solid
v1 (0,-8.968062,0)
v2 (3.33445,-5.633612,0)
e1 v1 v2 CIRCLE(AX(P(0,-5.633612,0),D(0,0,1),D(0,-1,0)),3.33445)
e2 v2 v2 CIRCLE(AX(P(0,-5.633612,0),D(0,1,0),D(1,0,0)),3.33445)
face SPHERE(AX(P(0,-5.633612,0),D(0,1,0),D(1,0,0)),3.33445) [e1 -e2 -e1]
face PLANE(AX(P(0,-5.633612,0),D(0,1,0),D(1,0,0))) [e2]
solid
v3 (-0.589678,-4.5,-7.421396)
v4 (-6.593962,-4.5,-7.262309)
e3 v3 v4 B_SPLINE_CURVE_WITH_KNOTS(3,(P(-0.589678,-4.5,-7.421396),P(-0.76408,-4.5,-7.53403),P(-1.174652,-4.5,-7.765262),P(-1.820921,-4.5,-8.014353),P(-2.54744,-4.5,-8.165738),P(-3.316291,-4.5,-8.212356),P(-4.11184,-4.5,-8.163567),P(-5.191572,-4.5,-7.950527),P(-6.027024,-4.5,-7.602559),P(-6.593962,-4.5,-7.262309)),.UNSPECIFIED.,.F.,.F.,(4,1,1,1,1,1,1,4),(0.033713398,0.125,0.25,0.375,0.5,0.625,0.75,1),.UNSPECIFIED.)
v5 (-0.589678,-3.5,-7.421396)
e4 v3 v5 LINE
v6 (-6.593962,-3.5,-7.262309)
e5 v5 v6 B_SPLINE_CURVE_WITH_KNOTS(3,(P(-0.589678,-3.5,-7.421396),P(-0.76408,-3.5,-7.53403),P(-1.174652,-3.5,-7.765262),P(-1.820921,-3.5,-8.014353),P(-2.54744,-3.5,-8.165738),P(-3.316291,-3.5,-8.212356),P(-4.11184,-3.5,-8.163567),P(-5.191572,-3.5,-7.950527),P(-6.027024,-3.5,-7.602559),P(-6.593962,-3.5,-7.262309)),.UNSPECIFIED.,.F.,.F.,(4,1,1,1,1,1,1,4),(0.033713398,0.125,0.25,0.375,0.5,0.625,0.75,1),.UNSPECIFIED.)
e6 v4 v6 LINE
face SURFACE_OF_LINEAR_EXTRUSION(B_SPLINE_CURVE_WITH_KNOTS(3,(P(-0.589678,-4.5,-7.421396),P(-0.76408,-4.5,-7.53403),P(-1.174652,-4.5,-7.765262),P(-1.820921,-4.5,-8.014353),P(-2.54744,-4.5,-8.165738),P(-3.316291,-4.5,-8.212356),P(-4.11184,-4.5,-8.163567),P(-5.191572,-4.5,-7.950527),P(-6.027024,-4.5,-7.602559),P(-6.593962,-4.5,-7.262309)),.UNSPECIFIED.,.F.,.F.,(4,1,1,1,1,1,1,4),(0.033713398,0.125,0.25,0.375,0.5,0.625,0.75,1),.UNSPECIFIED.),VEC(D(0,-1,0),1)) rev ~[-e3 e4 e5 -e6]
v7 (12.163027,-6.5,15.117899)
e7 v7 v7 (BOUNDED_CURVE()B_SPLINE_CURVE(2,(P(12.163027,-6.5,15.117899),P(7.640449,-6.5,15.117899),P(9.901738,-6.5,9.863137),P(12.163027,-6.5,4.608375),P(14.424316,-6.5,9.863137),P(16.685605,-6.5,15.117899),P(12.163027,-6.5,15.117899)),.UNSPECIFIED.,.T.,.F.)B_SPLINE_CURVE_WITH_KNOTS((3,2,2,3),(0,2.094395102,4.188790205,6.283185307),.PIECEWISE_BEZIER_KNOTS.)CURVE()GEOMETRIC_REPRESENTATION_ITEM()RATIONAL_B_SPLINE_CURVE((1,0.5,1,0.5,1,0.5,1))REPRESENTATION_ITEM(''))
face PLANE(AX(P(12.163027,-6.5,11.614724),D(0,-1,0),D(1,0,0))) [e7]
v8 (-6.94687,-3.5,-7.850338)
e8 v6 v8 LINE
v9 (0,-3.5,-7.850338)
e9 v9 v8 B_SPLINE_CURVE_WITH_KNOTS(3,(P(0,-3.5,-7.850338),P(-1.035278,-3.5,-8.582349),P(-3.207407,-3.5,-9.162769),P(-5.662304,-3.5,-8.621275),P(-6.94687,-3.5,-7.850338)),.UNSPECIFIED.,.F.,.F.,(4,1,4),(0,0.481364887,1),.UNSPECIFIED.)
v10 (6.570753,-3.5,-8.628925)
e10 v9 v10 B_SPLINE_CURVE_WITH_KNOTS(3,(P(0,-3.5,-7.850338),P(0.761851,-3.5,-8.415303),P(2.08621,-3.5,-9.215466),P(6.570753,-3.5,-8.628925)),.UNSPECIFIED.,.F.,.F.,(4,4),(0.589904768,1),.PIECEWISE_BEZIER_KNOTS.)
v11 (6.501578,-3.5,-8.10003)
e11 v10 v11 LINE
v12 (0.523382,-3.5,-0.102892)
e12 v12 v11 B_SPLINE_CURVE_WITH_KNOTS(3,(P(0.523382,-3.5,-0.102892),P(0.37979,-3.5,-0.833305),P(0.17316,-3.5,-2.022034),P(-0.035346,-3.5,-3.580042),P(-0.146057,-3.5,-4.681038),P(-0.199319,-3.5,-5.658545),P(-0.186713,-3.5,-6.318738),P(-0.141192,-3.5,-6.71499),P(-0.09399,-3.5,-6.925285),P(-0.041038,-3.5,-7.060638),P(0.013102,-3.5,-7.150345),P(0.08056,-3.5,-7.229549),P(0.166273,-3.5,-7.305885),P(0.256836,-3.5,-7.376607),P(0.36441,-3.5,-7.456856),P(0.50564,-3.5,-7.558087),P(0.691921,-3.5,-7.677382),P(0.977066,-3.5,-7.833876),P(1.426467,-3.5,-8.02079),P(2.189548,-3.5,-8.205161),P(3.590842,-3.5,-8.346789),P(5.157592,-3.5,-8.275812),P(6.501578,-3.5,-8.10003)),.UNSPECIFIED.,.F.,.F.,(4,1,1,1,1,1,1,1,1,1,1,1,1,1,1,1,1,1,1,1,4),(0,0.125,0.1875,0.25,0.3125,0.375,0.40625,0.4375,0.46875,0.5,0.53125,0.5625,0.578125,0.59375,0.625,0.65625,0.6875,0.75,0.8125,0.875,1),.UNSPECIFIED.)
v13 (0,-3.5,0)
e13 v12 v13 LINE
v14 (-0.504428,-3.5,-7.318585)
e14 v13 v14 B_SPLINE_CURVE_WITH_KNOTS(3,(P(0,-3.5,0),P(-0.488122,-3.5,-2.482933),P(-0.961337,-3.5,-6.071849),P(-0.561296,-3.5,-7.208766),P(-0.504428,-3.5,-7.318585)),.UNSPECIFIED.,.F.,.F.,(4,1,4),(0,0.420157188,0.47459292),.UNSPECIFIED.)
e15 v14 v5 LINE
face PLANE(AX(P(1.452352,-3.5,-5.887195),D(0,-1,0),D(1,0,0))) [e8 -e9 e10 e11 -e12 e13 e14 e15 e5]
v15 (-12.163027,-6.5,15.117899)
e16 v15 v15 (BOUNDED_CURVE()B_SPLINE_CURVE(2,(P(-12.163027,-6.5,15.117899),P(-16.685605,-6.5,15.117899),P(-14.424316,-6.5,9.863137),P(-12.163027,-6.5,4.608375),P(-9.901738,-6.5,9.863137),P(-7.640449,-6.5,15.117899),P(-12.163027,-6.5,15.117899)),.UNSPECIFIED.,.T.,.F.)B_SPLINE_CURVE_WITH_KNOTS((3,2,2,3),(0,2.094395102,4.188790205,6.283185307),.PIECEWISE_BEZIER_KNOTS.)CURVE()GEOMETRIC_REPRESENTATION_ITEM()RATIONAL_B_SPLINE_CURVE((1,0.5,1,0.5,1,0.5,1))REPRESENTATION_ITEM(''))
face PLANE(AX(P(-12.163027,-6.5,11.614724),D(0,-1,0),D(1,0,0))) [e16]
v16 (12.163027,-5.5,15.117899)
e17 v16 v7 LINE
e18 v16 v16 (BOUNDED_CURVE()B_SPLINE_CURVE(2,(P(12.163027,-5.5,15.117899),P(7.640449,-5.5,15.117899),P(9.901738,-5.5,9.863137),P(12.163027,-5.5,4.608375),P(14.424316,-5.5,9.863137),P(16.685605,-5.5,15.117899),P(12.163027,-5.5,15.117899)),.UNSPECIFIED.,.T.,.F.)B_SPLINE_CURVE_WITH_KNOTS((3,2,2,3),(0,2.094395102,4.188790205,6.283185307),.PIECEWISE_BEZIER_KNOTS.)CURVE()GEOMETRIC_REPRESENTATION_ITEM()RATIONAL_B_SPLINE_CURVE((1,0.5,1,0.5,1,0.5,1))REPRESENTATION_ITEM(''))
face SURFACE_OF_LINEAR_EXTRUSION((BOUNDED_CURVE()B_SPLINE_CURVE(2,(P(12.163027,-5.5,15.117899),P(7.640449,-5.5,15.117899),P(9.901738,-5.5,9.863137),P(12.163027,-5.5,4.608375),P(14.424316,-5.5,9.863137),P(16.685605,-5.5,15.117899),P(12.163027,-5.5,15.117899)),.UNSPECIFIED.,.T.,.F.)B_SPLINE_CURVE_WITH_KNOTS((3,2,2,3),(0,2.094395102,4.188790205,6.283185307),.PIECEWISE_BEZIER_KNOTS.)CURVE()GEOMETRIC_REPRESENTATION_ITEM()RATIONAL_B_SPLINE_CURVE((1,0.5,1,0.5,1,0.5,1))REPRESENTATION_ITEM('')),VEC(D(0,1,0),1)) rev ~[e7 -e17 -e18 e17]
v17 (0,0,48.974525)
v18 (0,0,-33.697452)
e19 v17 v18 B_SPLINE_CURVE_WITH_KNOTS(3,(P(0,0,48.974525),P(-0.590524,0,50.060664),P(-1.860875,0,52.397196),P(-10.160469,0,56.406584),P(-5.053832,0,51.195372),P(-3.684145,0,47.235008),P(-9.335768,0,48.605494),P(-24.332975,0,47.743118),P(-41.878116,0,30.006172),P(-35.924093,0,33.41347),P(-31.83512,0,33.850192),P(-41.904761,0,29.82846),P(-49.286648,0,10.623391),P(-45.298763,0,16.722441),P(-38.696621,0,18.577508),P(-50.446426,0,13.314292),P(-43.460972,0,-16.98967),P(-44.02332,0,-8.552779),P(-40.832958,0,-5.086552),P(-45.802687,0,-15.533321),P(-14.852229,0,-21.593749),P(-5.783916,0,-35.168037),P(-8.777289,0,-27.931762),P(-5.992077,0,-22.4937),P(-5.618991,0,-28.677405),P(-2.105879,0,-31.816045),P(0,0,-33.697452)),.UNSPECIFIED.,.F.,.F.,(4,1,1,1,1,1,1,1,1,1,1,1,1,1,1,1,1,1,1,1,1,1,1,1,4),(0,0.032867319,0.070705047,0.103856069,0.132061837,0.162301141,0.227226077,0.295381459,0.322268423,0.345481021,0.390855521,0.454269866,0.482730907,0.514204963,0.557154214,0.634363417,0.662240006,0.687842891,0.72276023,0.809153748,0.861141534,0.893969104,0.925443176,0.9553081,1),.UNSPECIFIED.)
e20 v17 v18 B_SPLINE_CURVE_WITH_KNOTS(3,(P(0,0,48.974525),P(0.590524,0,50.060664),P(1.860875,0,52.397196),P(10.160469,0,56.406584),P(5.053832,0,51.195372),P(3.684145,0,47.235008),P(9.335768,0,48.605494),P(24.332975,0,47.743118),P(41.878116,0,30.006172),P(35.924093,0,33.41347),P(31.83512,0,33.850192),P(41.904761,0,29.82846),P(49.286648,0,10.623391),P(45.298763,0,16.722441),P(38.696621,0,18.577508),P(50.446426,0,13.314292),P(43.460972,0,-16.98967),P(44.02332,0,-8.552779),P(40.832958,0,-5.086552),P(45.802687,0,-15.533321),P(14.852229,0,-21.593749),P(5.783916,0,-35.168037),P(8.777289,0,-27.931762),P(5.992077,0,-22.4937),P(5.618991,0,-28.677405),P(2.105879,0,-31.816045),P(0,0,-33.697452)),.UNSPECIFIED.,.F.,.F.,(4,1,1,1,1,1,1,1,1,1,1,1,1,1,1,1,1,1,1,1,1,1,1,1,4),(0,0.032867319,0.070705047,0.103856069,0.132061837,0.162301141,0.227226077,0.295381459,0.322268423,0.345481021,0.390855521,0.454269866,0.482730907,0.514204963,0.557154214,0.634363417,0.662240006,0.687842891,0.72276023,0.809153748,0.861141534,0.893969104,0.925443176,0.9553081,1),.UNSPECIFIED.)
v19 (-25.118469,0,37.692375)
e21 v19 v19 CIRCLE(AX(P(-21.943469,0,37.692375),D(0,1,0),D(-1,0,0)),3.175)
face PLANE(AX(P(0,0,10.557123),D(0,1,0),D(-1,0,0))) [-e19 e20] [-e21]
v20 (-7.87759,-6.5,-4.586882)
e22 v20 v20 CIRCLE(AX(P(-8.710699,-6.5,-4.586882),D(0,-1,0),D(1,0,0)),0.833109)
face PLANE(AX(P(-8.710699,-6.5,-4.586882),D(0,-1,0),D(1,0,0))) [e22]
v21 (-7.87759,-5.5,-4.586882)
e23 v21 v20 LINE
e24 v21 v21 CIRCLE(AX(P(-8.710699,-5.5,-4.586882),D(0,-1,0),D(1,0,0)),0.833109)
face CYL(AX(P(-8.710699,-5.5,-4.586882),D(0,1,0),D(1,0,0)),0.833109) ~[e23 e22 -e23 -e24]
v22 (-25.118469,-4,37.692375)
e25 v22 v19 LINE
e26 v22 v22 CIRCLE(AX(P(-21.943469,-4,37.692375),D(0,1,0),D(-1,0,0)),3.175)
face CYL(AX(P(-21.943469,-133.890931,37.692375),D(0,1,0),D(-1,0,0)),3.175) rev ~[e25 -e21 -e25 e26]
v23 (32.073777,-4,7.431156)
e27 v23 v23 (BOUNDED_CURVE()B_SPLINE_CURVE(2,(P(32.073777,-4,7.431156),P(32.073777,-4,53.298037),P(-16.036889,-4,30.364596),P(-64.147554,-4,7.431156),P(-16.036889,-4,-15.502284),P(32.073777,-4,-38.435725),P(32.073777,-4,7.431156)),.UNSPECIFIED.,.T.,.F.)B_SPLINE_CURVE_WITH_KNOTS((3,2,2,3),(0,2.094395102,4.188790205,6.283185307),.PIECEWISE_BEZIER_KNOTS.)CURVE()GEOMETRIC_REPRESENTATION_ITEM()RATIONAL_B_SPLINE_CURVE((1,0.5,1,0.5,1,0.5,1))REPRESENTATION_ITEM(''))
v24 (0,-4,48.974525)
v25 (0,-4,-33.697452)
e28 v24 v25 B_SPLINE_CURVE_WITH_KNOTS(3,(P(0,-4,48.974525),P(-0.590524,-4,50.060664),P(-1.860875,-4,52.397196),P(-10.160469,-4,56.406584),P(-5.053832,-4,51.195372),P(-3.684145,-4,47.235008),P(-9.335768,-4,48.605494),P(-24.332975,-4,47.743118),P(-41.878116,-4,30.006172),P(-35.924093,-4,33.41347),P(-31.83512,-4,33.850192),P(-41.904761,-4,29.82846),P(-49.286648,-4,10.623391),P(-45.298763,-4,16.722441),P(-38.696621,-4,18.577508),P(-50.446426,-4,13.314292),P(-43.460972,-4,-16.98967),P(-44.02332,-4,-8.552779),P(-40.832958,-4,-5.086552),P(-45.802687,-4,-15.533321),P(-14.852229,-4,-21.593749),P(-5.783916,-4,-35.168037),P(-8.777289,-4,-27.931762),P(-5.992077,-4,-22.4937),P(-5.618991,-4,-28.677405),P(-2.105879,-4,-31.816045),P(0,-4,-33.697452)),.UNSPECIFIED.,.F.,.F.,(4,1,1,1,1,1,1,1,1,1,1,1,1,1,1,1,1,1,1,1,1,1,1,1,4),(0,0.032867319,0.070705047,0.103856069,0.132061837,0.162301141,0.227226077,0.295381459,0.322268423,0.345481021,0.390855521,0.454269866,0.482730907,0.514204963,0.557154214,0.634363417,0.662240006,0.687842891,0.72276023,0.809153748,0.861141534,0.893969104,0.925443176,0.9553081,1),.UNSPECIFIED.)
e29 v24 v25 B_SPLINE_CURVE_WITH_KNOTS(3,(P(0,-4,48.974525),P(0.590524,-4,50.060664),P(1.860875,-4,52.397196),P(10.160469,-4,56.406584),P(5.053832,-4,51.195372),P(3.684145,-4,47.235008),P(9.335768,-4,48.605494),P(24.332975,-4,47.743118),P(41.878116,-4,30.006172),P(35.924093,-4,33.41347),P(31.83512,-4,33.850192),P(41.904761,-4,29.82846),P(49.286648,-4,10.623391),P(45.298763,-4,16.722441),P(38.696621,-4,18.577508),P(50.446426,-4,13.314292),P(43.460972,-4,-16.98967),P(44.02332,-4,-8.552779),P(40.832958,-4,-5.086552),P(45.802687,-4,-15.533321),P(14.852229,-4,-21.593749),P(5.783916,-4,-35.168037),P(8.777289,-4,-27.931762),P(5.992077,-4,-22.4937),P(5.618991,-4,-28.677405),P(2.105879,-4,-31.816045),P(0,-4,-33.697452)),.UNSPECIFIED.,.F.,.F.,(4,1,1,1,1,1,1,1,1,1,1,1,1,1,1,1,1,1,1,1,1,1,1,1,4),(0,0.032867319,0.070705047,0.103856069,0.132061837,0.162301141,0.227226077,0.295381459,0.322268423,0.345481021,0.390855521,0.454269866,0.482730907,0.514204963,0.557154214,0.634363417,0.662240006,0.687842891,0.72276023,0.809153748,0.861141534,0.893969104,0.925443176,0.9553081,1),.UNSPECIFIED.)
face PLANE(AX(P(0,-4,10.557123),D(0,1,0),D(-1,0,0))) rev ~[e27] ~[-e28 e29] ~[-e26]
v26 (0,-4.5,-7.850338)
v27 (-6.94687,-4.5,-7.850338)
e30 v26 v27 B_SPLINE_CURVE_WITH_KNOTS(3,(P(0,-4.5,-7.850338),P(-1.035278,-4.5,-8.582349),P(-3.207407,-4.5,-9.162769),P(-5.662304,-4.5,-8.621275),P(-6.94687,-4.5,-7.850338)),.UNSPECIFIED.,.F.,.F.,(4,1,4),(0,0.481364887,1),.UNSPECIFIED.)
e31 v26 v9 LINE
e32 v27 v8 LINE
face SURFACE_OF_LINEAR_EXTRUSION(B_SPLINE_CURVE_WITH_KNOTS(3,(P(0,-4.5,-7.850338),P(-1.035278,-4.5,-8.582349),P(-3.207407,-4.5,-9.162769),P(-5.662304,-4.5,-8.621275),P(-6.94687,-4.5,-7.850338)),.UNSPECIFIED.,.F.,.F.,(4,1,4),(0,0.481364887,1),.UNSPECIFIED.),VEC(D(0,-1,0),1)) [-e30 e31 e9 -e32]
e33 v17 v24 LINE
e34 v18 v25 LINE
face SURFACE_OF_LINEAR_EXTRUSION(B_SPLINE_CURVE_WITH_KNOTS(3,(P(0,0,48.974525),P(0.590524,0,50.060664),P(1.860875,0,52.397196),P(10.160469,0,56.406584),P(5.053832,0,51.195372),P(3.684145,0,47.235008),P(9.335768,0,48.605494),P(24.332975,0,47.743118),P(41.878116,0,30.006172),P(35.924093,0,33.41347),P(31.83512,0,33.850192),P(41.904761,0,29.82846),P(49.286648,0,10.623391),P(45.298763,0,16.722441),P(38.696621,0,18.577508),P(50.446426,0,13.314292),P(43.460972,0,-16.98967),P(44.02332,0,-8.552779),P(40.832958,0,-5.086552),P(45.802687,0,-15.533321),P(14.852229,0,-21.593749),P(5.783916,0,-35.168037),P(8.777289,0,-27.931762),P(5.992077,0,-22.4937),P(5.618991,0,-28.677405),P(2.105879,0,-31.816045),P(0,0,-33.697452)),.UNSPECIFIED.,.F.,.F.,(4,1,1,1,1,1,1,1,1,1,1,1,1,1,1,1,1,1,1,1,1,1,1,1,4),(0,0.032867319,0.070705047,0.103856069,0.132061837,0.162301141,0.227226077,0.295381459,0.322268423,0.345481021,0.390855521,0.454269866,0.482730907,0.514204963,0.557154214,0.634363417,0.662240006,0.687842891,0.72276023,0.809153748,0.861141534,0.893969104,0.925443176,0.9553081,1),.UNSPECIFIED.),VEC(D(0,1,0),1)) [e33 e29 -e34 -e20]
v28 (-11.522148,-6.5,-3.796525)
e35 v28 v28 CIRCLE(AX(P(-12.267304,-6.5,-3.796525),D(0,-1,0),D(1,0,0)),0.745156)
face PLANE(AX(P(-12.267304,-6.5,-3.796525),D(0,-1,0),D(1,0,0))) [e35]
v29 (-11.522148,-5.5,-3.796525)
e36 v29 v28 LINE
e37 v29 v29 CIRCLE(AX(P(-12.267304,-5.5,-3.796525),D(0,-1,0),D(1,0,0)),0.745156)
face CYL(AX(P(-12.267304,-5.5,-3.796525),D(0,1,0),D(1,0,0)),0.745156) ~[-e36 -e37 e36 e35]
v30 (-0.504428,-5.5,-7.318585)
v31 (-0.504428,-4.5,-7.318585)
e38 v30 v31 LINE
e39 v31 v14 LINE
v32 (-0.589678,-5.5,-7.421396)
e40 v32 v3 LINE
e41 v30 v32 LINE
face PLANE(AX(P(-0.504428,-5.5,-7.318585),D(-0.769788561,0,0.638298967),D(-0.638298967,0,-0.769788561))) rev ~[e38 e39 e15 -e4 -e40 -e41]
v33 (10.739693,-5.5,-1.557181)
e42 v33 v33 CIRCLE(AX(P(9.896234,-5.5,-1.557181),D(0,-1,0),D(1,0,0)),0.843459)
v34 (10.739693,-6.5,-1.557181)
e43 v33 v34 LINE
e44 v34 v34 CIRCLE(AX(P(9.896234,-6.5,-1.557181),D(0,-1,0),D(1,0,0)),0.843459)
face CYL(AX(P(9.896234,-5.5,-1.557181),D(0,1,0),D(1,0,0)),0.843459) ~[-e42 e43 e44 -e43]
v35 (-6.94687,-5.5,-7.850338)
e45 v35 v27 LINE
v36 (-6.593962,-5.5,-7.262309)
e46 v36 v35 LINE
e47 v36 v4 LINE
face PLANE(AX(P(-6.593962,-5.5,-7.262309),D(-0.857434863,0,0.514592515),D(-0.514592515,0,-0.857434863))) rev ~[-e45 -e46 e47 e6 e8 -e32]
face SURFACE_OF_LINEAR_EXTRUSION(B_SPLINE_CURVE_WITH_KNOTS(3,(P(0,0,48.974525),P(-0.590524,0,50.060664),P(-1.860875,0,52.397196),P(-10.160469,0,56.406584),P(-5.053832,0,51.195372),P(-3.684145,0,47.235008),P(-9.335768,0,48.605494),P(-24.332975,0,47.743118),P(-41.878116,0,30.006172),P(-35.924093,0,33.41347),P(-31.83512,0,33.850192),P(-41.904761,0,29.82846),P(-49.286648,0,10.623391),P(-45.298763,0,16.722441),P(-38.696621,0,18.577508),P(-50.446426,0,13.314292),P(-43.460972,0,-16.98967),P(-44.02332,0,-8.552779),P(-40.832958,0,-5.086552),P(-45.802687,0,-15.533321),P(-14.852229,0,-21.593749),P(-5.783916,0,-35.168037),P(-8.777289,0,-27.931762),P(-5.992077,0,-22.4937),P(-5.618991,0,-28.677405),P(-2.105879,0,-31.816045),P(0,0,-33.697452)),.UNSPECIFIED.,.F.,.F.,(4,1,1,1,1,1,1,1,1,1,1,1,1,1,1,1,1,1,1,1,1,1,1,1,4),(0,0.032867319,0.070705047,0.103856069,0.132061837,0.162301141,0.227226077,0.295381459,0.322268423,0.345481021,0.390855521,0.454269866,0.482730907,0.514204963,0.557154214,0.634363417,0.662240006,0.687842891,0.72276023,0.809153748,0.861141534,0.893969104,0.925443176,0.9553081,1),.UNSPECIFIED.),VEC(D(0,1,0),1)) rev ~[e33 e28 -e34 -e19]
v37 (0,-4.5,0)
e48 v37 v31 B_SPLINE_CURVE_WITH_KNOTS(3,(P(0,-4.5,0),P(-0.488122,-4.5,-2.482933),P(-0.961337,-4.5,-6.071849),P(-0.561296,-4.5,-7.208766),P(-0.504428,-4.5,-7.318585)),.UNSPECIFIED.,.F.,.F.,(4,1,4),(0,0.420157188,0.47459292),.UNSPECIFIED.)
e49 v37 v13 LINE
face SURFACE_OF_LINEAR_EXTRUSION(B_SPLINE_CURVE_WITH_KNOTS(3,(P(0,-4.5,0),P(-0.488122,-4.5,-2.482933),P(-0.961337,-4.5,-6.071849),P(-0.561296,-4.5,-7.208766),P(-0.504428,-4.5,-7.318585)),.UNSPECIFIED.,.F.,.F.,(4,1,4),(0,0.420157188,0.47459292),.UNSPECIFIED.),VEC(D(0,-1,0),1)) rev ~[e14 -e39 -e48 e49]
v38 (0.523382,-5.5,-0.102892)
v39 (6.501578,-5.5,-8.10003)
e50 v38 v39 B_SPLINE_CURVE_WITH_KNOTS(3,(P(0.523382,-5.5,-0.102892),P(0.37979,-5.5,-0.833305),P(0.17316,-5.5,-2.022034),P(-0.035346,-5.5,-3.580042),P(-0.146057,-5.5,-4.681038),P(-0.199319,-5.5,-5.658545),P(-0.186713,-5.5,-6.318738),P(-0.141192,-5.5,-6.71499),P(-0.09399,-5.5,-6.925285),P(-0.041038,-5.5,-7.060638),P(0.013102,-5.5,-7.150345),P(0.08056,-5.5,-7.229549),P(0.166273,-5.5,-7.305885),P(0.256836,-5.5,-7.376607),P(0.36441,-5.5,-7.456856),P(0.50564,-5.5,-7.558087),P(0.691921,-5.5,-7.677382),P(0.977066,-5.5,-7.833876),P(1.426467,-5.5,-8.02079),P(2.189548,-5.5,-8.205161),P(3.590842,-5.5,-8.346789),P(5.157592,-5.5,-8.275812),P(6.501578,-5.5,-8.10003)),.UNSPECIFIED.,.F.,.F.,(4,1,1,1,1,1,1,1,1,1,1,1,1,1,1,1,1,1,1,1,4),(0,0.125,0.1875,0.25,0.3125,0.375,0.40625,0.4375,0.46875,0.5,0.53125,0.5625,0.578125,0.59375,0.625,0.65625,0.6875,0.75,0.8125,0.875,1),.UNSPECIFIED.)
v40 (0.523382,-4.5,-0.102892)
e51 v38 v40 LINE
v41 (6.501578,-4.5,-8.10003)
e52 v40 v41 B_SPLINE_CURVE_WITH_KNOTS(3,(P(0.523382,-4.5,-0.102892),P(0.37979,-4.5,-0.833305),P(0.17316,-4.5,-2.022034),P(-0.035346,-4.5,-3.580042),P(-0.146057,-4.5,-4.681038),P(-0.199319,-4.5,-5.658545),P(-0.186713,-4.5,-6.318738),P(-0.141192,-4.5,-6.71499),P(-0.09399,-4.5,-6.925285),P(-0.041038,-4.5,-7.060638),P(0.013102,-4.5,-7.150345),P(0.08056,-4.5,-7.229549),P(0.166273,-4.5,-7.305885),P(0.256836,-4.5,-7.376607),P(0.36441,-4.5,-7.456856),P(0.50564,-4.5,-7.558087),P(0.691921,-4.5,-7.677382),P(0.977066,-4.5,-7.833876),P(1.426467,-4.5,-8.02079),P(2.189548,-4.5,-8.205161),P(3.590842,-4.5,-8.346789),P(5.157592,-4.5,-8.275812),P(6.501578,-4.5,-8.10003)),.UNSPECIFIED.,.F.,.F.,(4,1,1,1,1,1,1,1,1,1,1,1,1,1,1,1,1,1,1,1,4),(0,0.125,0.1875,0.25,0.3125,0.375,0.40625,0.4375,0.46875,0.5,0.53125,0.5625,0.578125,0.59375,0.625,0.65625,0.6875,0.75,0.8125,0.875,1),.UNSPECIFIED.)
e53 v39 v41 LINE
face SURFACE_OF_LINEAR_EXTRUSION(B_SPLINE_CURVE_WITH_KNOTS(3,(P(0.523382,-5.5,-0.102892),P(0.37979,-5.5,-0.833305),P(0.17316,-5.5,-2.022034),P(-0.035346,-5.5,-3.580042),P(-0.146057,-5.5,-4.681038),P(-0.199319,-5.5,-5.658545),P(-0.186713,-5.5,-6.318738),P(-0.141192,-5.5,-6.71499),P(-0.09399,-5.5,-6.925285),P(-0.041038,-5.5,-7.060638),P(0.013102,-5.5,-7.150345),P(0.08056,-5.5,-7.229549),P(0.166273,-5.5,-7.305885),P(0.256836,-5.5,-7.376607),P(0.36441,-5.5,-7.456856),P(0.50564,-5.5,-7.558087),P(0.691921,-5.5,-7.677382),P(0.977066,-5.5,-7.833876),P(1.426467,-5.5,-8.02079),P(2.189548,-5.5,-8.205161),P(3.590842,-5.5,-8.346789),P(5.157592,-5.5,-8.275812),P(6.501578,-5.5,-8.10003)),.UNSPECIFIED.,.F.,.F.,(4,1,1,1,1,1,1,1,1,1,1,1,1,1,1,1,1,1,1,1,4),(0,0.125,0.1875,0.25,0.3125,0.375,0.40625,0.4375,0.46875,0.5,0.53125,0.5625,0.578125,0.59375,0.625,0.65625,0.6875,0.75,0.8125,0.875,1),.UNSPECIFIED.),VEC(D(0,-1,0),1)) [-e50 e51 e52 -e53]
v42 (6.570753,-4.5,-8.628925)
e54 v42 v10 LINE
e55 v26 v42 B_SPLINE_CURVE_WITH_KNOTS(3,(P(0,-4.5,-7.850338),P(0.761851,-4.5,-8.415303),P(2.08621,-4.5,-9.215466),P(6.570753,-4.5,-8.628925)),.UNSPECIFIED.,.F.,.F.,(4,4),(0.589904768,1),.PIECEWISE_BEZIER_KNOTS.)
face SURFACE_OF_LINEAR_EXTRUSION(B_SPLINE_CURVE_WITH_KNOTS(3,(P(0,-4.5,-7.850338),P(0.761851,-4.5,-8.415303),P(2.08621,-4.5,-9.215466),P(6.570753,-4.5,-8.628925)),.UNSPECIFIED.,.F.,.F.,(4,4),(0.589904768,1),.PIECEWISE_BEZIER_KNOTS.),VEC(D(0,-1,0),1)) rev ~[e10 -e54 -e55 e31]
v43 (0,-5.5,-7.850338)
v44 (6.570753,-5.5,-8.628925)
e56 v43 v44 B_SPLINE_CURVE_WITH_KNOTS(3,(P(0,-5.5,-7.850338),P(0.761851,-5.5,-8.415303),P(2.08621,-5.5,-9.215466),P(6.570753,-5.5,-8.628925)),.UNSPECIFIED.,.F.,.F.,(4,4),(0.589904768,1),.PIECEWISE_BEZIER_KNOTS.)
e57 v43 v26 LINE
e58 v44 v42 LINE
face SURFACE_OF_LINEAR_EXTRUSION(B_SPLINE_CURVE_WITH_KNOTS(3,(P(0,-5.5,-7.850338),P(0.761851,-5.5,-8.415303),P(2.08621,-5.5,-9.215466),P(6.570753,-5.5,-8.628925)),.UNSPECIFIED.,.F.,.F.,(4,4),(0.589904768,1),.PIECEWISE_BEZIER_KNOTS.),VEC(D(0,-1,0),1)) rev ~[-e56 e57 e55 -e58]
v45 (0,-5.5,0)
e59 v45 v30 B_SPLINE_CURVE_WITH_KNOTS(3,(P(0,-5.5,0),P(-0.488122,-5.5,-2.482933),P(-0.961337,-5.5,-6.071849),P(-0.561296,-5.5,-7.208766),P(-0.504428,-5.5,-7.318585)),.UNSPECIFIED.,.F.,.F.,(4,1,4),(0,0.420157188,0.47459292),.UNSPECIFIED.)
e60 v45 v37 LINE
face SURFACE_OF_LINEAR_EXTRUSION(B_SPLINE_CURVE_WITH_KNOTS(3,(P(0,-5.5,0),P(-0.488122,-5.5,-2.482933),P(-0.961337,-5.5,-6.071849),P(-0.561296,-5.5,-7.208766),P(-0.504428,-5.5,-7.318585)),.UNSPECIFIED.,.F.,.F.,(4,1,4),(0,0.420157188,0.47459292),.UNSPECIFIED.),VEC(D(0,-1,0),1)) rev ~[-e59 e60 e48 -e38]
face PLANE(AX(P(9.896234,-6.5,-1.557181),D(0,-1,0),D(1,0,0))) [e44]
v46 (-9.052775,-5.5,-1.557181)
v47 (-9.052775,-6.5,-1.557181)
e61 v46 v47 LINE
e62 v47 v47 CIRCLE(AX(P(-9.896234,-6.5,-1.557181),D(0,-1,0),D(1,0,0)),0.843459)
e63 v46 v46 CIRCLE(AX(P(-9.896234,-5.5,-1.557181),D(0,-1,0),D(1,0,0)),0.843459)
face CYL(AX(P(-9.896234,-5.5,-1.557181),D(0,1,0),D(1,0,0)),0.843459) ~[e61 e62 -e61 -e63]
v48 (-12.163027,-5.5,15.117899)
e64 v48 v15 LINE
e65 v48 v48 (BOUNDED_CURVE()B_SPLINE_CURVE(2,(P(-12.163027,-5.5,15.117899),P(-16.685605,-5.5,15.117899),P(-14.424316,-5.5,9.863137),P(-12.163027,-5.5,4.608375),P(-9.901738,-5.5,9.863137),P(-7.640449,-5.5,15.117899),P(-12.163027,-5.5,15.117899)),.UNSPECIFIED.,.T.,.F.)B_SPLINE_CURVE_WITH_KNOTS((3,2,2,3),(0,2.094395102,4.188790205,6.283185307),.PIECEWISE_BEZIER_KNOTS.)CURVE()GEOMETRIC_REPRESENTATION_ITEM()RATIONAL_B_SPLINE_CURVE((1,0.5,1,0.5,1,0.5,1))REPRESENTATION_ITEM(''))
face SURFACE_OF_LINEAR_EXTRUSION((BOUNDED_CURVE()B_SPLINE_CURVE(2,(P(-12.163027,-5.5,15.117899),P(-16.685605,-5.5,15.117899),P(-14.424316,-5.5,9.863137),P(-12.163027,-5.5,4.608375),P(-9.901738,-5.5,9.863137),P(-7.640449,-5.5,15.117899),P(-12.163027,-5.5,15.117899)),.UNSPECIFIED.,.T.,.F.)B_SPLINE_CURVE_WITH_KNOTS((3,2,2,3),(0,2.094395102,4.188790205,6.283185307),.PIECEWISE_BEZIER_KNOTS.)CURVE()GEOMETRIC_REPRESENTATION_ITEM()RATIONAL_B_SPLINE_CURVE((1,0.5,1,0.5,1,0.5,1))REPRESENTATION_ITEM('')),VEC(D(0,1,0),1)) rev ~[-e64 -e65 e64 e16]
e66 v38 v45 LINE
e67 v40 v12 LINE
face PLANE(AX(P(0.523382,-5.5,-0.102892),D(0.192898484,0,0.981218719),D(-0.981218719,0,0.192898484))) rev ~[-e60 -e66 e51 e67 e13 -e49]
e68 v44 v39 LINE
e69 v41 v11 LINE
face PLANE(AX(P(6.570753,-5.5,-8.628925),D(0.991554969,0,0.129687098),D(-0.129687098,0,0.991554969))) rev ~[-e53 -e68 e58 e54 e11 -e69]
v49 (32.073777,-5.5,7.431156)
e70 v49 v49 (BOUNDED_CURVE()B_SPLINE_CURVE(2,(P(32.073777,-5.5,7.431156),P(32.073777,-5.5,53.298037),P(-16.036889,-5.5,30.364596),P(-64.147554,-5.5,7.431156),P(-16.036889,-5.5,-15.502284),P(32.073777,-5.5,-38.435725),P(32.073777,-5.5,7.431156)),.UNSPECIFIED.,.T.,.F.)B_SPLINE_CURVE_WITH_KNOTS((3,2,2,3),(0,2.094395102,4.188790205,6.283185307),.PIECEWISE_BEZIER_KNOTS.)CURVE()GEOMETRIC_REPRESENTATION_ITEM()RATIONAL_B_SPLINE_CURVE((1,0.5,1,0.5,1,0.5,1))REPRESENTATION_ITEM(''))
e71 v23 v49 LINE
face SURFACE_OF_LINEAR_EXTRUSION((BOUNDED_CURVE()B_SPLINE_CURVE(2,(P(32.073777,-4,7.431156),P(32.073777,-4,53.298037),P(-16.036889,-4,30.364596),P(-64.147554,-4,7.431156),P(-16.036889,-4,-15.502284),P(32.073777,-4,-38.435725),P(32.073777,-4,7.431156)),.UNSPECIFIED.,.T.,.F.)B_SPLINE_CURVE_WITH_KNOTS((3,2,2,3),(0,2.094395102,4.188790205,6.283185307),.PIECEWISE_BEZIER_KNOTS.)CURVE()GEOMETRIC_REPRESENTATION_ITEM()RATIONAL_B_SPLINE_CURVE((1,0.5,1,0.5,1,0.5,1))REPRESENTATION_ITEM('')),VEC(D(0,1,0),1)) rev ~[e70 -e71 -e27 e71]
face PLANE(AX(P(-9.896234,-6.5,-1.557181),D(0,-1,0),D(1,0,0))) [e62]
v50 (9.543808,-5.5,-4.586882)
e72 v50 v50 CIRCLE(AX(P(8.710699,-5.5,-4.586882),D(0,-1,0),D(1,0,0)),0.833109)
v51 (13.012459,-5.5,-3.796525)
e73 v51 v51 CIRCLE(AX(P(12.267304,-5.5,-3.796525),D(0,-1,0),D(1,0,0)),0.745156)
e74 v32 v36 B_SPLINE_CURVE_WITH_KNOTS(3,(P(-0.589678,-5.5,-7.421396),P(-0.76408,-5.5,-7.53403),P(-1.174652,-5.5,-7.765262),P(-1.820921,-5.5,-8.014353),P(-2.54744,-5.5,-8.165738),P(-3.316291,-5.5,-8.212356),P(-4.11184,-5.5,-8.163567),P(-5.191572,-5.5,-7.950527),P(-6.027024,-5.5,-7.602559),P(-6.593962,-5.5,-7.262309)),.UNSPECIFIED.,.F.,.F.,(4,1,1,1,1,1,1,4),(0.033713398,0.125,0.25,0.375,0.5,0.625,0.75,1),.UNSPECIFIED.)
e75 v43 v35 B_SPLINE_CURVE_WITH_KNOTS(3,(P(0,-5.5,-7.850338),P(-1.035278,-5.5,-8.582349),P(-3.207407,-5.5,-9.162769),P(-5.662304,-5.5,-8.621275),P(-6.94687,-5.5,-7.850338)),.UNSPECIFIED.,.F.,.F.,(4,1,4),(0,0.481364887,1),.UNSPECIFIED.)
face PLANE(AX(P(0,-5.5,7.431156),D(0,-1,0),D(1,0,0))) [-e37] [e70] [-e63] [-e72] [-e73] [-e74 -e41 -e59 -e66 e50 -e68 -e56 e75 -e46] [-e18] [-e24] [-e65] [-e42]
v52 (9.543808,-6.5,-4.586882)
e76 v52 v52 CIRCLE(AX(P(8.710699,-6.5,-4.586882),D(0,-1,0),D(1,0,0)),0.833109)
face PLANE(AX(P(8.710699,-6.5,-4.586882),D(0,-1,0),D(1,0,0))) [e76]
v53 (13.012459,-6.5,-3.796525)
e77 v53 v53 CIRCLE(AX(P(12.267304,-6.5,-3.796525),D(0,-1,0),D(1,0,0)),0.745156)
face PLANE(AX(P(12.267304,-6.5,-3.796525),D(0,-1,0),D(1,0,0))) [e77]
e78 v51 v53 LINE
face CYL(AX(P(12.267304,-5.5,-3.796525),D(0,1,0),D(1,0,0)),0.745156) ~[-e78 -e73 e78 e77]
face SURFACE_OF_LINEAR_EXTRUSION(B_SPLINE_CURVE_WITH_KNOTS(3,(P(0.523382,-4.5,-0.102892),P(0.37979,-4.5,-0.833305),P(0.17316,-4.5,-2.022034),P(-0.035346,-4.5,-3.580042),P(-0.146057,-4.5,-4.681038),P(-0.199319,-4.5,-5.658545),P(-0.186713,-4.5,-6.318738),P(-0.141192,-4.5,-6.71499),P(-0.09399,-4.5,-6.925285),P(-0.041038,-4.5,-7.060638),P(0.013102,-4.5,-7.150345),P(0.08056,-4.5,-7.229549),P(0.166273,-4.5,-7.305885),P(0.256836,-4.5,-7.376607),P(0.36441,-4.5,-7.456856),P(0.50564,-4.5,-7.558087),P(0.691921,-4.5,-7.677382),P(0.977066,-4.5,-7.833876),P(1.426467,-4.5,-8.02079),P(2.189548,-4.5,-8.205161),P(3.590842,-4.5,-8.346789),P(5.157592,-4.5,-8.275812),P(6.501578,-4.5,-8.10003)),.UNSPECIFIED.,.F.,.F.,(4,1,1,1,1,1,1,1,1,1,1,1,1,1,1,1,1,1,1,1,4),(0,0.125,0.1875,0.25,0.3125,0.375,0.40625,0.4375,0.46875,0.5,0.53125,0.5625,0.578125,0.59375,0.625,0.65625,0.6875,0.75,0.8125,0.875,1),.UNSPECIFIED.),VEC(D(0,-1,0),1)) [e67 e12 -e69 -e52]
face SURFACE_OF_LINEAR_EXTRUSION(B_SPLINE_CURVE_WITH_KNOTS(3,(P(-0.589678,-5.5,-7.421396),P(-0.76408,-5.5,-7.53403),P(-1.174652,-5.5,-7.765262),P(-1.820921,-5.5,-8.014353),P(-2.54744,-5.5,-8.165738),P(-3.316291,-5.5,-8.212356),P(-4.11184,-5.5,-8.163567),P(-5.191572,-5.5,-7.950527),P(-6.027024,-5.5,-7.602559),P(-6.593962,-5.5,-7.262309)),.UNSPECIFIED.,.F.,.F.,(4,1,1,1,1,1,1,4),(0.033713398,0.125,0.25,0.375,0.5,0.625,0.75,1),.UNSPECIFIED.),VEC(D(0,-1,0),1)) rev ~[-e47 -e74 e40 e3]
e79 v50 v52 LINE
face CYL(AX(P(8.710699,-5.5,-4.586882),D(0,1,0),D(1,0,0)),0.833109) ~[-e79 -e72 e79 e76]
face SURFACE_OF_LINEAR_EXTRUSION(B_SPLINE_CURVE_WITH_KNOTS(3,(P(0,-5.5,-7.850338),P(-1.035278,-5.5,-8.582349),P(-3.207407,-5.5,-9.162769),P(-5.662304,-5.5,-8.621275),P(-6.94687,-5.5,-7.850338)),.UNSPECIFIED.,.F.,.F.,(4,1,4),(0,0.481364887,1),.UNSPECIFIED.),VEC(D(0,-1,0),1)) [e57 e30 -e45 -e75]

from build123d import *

# Parameters (mm, degrees)
F1_DEPTH  = 4
F3_DEPTH  = 1.5
F7_DEPTH  = 1
F8_R      = 0.8434589126
F8_R_2    = 0.7451557878
F8_R_3    = 0.8331091663
F9_DEPTH  = 1
F11_D     = 6.35
F13_DEPTH = 1
F14_DEPTH = 1


# Not quite as in the source:
# - ends of sketch curves that miss each other by under 0.0002 mm in the source are joined
# - the dataset's text gives a spline's control points without its knots; the knots are read off the source's solid


with BuildPart() as f1:
    # F0 (on Front) → F1 (new body)
    with BuildSketch(Plane.XZ):
        with BuildLine():
            add(Edge.make_bspline(
                [(0, 48.9745251834), (0.5905240779, 50.0606643379), (1.860875099, 52.3971956253), (10.1604689545, 56.4065843429), (5.0538324692, 51.1953719423), (3.6841452297, 47.2350083151), (9.3357678376, 48.605493595), (24.3329752849, 47.7431180711), (41.8781156231, 30.0061723136), (35.924093302, 33.4134701449), (31.8351204996, 33.8501917737), (41.9047611955, 29.8284598447), (49.2866484075, 10.6233912762), (45.2987628842, 16.7224406114), (38.6966212633, 18.5775084886), (50.4464264996, 13.3142921545), (43.4609717324, -16.9896703334), (44.0233204496, -8.5527794206), (40.8329577777, -5.0865522771), (45.8026866177, -15.5333206311), (14.8522287096, -21.5937486656), (5.7839163713, -35.1680373412), (8.7772886061, -27.9317621535), (5.992076876, -22.4937004561), (5.618991097, -28.6774050245), (2.1058790474, -31.8160447921), (0, -33.6974523962)],
                knots=[0, 0, 0, 0, 0.0328673193, 0.0707050469, 0.1038560693, 0.1320618367, 0.1623011415, 0.2272260769, 0.2953814591, 0.3222684226, 0.3454810209, 0.3908555213, 0.4542698663, 0.482730907, 0.5142049633, 0.5571542136, 0.6343634166, 0.6622400057, 0.6878428911, 0.7227602299, 0.8091537485, 0.8611415344, 0.8939691042, 0.9254431764, 0.9553080999, 1, 1, 1, 1], degree=3))
            add(Edge.make_bspline(
                [(0, 48.9745251834), (-0.5905240779, 50.0606643379), (-1.860875099, 52.3971956253), (-10.1604689545, 56.4065843429), (-5.0538324692, 51.1953719423), (-3.6841452297, 47.2350083151), (-9.3357678376, 48.605493595), (-24.3329752849, 47.7431180711), (-41.8781156231, 30.0061723136), (-35.924093302, 33.4134701449), (-31.8351204996, 33.8501917737), (-41.9047611955, 29.8284598447), (-49.2866484075, 10.6233912762), (-45.2987628842, 16.7224406114), (-38.6966212633, 18.5775084886), (-50.4464264996, 13.3142921545), (-43.4609717324, -16.9896703334), (-44.0233204496, -8.5527794206), (-40.8329577777, -5.0865522771), (-45.8026866177, -15.5333206311), (-14.8522287096, -21.5937486656), (-5.7839163713, -35.1680373412), (-8.7772886061, -27.9317621535), (-5.992076876, -22.4937004561), (-5.618991097, -28.6774050245), (-2.1058790474, -31.8160447921), (0, -33.6974523962)],
                knots=[0, 0, 0, 0, 0.0328673193, 0.0707050469, 0.1038560693, 0.1320618367, 0.1623011415, 0.2272260769, 0.2953814591, 0.3222684226, 0.3454810209, 0.3908555213, 0.4542698663, 0.482730907, 0.5142049633, 0.5571542136, 0.6343634166, 0.6622400057, 0.6878428911, 0.7227602299, 0.8091537485, 0.8611415344, 0.8939691042, 0.9254431764, 0.9553080999, 1, 1, 1, 1], degree=3))
        make_face()
    extrude(amount=F1_DEPTH)

    # F2 (on face) → F3 (join)
    with BuildSketch(Plane.XZ.offset(4)):
        with BuildLine():
            add(Edge.make_bspline(
                [(32.073777169, 7.431156002), (32.073777169, 53.2980368481), (-16.0368885845, 30.3645964251), (-64.147554338, 7.431156002), (-16.0368885845, -15.5022844211), (32.073777169, -38.4357248442), (32.073777169, 7.431156002)],
                knots=[0, 0, 0, 2.0943951024, 2.0943951024, 4.1887902048, 4.1887902048, 6.2831853072, 6.2831853072, 6.2831853072], degree=2, weights=[1, 0.5, 1, 0.5, 1, 0.5, 1]))
        make_face()
    extrude(amount=F3_DEPTH)

    # F6 (on face) → F7 (join)
    with BuildSketch(Plane.XZ.offset(5.5)):
        with BuildLine():
            add(Edge.make_bspline(
                [(-12.1630271897, 15.1178985834), (-16.6856053012, 15.1178985834), (-14.4243162454, 9.8631368019), (-12.1630271897, 4.6083750203), (-9.9017381339, 9.8631368019), (-7.6404490782, 15.1178985834), (-12.1630271897, 15.1178985834)],
                knots=[0, 0, 0, 2.0943951024, 2.0943951024, 4.1887902048, 4.1887902048, 6.2831853072, 6.2831853072, 6.2831853072], degree=2, weights=[1, 0.5, 1, 0.5, 1, 0.5, 1]))
        make_face()
        with BuildLine():
            add(Edge.make_bspline(
                [(12.1630271897, 15.1178985834), (7.6404490782, 15.1178985834), (9.9017381339, 9.8631368019), (12.1630271897, 4.6083750203), (14.4243162454, 9.8631368019), (16.6856053012, 15.1178985834), (12.1630271897, 15.1178985834)],
                knots=[0, 0, 0, 2.0943951024, 2.0943951024, 4.1887902048, 4.1887902048, 6.2831853072, 6.2831853072, 6.2831853072], degree=2, weights=[1, 0.5, 1, 0.5, 1, 0.5, 1]))
        make_face()
    extrude(amount=F7_DEPTH)

    # F8 (on face) → F9 (join)
    with BuildSketch(Plane.XZ.offset(5.5)):
        with Locations((9.8962336779, -1.557180658)):
            Circle(F8_R)
        with Locations((12.2673036531, -3.7965250667)):
            Circle(F8_R_2)
        with Locations((8.7106991559, -4.5868819579)):
            Circle(F8_R_3)
        with Locations((-9.8962336779, -1.557180658)):
            Circle(F8_R)
        with Locations((-12.2673036531, -3.7965250667)):
            Circle(F8_R_2)
        with Locations((-8.7106991559, -4.5868819579)):
            Circle(F8_R_3)
    extrude(amount=F9_DEPTH)

    # F11 (through all)
    with Locations(Plane.XZ.offset(4)):
        with Locations((-21.9434686005, 37.6923754811)):
            Hole(F11_D / 2)

    # F12 (on face) → F13 (cut)
    with BuildSketch(Plane.XZ.offset(5.5)):
        with BuildLine():
            Line((0.5233820891, -0.102892056), (0, 0))
            add(Edge.make_bspline(
                [(0, 0), (-0.4881215915, -2.482933166), (-0.9613370757, -6.0718488601), (-0.5612955072, -7.208765739), (-0.5044280314, -7.318585159)],
                knots=[0, 0, 0, 0, 0.420157188, 0.4745929198, 0.4745929198, 0.4745929198, 0.4745929198], degree=3))
            add(Edge.make_bspline(
                [(-0.5044280314, -7.318585159), (-0.3839649909, -7.5512169235), (-0.2142195664, -7.6914798202), (0, -7.8503383877)],
                knots=[0.4745929198, 0.4745929198, 0.4745929198, 0.4745929198, 0.5899047683, 0.5899047683, 0.5899047683, 0.5899047683], degree=3))
            add(Edge.make_bspline(
                [(0, -7.8503383877), (0.7618507889, -8.4153032363), (2.0862101548, -9.2154659724), (6.5707527101, -8.6289253086)],
                knots=[0.5899047683, 0.5899047683, 0.5899047683, 0.5899047683, 1, 1, 1, 1], degree=3))
            Line((6.5707527101, -8.6289253086), (6.5015776088, -8.1000298636))
            add(Edge.make_bspline(
                [(0.5233820891, -0.102892056), (0.3797897829, -0.8333045303), (0.1731601234, -2.0220344332), (-0.0353459818, -3.5800416091), (-0.1460573612, -4.6810377313), (-0.199319377, -5.6585454397), (-0.1867127098, -6.3187377859), (-0.141191681, -6.7149895118), (-0.0939902885, -6.9252852479), (-0.0410382703, -7.060637948), (0.0131017546, -7.1503449609), (0.0805598098, -7.2295486825), (0.1662733588, -7.3058848998), (0.2568355886, -7.3766068571), (0.3644102935, -7.4568564767), (0.5056396611, -7.5580867604), (0.6919212974, -7.6773815015), (0.977065634, -7.8338758033), (1.4264666337, -8.0207895201), (2.1895483998, -8.2051613796), (3.5908418883, -8.3467889078), (5.15759163, -8.2758119904), (6.5015776088, -8.1000298636)],
                knots=[0, 0, 0, 0, 0.125, 0.1875, 0.25, 0.3125, 0.375, 0.40625, 0.4375, 0.46875, 0.5, 0.53125, 0.5625, 0.578125, 0.59375, 0.625, 0.65625, 0.6875, 0.75, 0.8125, 0.875, 1, 1, 1, 1], degree=3))
        make_face()
        with BuildLine():
            add(Edge.make_bspline(
                [(-0.5044280314, -7.318585159), (-0.3839649909, -7.5512169235), (-0.2142195664, -7.6914798202), (0, -7.8503383877)],
                knots=[0.4745929198, 0.4745929198, 0.4745929198, 0.4745929198, 0.5899047683, 0.5899047683, 0.5899047683, 0.5899047683], degree=3))
            Line((-0.5044280314, -7.318585159), (-0.5896776551, -7.4213962061))
            add(Edge.make_bspline(
                [(-0.5896776551, -7.4213962061), (-0.764080003, -7.5340299903), (-1.1746516134, -7.7652622598), (-1.8209211502, -8.0143530956), (-2.54743991, -8.1657381012), (-3.3162912457, -8.2123557487), (-4.1118400446, -8.1635665698), (-5.1915722143, -7.9505272579), (-6.027023617, -7.6025591287), (-6.593961875, -7.2623091615)],
                knots=[0.0337133983, 0.0337133983, 0.0337133983, 0.0337133983, 0.125, 0.25, 0.375, 0.5, 0.625, 0.75, 1, 1, 1, 1], degree=3))
            Line((-6.593961875, -7.2623091615), (-6.9468696602, -7.8503383877))
            add(Edge.make_bspline(
                [(0, -7.8503383877), (-1.0352784213, -8.5823494277), (-3.2074066813, -9.1627686895), (-5.6623036495, -8.6212751465), (-6.9468696602, -7.8503383877)],
                knots=[0, 0, 0, 0, 0.4813648874, 1, 1, 1, 1], degree=3))
        make_face()
    extrude(amount=-F13_DEPTH, mode=Mode.SUBTRACT)

    # F14 (cut): a face of the model
    f14_faces = [f1.faces().sort_by_distance(p)[0] for p in [
        (-0.479223587, -4.5, -6.8214875179),
    ]]
    extrude(f14_faces, amount=-F14_DEPTH, mode=Mode.SUBTRACT)


with BuildPart() as f5:
    # F4 (on Top) → F5 (revolve)
    with BuildSketch(Plane.XY):
        with BuildLine():
            Line((0, -5.6336116977), (0, -8.9680617675))
            ThreePointArc((0, -8.9680617675), (2.3578122559, -7.9914239536), (3.3344500698, -5.6336116977))
            Line((3.3344500698, -5.6336116977), (0, -5.6336116977))
        make_face()
    revolve(axis=Axis((0, -7.3008367326, 0), (0, 1, 0)))


solid = Compound([f1.part, f5.part])
